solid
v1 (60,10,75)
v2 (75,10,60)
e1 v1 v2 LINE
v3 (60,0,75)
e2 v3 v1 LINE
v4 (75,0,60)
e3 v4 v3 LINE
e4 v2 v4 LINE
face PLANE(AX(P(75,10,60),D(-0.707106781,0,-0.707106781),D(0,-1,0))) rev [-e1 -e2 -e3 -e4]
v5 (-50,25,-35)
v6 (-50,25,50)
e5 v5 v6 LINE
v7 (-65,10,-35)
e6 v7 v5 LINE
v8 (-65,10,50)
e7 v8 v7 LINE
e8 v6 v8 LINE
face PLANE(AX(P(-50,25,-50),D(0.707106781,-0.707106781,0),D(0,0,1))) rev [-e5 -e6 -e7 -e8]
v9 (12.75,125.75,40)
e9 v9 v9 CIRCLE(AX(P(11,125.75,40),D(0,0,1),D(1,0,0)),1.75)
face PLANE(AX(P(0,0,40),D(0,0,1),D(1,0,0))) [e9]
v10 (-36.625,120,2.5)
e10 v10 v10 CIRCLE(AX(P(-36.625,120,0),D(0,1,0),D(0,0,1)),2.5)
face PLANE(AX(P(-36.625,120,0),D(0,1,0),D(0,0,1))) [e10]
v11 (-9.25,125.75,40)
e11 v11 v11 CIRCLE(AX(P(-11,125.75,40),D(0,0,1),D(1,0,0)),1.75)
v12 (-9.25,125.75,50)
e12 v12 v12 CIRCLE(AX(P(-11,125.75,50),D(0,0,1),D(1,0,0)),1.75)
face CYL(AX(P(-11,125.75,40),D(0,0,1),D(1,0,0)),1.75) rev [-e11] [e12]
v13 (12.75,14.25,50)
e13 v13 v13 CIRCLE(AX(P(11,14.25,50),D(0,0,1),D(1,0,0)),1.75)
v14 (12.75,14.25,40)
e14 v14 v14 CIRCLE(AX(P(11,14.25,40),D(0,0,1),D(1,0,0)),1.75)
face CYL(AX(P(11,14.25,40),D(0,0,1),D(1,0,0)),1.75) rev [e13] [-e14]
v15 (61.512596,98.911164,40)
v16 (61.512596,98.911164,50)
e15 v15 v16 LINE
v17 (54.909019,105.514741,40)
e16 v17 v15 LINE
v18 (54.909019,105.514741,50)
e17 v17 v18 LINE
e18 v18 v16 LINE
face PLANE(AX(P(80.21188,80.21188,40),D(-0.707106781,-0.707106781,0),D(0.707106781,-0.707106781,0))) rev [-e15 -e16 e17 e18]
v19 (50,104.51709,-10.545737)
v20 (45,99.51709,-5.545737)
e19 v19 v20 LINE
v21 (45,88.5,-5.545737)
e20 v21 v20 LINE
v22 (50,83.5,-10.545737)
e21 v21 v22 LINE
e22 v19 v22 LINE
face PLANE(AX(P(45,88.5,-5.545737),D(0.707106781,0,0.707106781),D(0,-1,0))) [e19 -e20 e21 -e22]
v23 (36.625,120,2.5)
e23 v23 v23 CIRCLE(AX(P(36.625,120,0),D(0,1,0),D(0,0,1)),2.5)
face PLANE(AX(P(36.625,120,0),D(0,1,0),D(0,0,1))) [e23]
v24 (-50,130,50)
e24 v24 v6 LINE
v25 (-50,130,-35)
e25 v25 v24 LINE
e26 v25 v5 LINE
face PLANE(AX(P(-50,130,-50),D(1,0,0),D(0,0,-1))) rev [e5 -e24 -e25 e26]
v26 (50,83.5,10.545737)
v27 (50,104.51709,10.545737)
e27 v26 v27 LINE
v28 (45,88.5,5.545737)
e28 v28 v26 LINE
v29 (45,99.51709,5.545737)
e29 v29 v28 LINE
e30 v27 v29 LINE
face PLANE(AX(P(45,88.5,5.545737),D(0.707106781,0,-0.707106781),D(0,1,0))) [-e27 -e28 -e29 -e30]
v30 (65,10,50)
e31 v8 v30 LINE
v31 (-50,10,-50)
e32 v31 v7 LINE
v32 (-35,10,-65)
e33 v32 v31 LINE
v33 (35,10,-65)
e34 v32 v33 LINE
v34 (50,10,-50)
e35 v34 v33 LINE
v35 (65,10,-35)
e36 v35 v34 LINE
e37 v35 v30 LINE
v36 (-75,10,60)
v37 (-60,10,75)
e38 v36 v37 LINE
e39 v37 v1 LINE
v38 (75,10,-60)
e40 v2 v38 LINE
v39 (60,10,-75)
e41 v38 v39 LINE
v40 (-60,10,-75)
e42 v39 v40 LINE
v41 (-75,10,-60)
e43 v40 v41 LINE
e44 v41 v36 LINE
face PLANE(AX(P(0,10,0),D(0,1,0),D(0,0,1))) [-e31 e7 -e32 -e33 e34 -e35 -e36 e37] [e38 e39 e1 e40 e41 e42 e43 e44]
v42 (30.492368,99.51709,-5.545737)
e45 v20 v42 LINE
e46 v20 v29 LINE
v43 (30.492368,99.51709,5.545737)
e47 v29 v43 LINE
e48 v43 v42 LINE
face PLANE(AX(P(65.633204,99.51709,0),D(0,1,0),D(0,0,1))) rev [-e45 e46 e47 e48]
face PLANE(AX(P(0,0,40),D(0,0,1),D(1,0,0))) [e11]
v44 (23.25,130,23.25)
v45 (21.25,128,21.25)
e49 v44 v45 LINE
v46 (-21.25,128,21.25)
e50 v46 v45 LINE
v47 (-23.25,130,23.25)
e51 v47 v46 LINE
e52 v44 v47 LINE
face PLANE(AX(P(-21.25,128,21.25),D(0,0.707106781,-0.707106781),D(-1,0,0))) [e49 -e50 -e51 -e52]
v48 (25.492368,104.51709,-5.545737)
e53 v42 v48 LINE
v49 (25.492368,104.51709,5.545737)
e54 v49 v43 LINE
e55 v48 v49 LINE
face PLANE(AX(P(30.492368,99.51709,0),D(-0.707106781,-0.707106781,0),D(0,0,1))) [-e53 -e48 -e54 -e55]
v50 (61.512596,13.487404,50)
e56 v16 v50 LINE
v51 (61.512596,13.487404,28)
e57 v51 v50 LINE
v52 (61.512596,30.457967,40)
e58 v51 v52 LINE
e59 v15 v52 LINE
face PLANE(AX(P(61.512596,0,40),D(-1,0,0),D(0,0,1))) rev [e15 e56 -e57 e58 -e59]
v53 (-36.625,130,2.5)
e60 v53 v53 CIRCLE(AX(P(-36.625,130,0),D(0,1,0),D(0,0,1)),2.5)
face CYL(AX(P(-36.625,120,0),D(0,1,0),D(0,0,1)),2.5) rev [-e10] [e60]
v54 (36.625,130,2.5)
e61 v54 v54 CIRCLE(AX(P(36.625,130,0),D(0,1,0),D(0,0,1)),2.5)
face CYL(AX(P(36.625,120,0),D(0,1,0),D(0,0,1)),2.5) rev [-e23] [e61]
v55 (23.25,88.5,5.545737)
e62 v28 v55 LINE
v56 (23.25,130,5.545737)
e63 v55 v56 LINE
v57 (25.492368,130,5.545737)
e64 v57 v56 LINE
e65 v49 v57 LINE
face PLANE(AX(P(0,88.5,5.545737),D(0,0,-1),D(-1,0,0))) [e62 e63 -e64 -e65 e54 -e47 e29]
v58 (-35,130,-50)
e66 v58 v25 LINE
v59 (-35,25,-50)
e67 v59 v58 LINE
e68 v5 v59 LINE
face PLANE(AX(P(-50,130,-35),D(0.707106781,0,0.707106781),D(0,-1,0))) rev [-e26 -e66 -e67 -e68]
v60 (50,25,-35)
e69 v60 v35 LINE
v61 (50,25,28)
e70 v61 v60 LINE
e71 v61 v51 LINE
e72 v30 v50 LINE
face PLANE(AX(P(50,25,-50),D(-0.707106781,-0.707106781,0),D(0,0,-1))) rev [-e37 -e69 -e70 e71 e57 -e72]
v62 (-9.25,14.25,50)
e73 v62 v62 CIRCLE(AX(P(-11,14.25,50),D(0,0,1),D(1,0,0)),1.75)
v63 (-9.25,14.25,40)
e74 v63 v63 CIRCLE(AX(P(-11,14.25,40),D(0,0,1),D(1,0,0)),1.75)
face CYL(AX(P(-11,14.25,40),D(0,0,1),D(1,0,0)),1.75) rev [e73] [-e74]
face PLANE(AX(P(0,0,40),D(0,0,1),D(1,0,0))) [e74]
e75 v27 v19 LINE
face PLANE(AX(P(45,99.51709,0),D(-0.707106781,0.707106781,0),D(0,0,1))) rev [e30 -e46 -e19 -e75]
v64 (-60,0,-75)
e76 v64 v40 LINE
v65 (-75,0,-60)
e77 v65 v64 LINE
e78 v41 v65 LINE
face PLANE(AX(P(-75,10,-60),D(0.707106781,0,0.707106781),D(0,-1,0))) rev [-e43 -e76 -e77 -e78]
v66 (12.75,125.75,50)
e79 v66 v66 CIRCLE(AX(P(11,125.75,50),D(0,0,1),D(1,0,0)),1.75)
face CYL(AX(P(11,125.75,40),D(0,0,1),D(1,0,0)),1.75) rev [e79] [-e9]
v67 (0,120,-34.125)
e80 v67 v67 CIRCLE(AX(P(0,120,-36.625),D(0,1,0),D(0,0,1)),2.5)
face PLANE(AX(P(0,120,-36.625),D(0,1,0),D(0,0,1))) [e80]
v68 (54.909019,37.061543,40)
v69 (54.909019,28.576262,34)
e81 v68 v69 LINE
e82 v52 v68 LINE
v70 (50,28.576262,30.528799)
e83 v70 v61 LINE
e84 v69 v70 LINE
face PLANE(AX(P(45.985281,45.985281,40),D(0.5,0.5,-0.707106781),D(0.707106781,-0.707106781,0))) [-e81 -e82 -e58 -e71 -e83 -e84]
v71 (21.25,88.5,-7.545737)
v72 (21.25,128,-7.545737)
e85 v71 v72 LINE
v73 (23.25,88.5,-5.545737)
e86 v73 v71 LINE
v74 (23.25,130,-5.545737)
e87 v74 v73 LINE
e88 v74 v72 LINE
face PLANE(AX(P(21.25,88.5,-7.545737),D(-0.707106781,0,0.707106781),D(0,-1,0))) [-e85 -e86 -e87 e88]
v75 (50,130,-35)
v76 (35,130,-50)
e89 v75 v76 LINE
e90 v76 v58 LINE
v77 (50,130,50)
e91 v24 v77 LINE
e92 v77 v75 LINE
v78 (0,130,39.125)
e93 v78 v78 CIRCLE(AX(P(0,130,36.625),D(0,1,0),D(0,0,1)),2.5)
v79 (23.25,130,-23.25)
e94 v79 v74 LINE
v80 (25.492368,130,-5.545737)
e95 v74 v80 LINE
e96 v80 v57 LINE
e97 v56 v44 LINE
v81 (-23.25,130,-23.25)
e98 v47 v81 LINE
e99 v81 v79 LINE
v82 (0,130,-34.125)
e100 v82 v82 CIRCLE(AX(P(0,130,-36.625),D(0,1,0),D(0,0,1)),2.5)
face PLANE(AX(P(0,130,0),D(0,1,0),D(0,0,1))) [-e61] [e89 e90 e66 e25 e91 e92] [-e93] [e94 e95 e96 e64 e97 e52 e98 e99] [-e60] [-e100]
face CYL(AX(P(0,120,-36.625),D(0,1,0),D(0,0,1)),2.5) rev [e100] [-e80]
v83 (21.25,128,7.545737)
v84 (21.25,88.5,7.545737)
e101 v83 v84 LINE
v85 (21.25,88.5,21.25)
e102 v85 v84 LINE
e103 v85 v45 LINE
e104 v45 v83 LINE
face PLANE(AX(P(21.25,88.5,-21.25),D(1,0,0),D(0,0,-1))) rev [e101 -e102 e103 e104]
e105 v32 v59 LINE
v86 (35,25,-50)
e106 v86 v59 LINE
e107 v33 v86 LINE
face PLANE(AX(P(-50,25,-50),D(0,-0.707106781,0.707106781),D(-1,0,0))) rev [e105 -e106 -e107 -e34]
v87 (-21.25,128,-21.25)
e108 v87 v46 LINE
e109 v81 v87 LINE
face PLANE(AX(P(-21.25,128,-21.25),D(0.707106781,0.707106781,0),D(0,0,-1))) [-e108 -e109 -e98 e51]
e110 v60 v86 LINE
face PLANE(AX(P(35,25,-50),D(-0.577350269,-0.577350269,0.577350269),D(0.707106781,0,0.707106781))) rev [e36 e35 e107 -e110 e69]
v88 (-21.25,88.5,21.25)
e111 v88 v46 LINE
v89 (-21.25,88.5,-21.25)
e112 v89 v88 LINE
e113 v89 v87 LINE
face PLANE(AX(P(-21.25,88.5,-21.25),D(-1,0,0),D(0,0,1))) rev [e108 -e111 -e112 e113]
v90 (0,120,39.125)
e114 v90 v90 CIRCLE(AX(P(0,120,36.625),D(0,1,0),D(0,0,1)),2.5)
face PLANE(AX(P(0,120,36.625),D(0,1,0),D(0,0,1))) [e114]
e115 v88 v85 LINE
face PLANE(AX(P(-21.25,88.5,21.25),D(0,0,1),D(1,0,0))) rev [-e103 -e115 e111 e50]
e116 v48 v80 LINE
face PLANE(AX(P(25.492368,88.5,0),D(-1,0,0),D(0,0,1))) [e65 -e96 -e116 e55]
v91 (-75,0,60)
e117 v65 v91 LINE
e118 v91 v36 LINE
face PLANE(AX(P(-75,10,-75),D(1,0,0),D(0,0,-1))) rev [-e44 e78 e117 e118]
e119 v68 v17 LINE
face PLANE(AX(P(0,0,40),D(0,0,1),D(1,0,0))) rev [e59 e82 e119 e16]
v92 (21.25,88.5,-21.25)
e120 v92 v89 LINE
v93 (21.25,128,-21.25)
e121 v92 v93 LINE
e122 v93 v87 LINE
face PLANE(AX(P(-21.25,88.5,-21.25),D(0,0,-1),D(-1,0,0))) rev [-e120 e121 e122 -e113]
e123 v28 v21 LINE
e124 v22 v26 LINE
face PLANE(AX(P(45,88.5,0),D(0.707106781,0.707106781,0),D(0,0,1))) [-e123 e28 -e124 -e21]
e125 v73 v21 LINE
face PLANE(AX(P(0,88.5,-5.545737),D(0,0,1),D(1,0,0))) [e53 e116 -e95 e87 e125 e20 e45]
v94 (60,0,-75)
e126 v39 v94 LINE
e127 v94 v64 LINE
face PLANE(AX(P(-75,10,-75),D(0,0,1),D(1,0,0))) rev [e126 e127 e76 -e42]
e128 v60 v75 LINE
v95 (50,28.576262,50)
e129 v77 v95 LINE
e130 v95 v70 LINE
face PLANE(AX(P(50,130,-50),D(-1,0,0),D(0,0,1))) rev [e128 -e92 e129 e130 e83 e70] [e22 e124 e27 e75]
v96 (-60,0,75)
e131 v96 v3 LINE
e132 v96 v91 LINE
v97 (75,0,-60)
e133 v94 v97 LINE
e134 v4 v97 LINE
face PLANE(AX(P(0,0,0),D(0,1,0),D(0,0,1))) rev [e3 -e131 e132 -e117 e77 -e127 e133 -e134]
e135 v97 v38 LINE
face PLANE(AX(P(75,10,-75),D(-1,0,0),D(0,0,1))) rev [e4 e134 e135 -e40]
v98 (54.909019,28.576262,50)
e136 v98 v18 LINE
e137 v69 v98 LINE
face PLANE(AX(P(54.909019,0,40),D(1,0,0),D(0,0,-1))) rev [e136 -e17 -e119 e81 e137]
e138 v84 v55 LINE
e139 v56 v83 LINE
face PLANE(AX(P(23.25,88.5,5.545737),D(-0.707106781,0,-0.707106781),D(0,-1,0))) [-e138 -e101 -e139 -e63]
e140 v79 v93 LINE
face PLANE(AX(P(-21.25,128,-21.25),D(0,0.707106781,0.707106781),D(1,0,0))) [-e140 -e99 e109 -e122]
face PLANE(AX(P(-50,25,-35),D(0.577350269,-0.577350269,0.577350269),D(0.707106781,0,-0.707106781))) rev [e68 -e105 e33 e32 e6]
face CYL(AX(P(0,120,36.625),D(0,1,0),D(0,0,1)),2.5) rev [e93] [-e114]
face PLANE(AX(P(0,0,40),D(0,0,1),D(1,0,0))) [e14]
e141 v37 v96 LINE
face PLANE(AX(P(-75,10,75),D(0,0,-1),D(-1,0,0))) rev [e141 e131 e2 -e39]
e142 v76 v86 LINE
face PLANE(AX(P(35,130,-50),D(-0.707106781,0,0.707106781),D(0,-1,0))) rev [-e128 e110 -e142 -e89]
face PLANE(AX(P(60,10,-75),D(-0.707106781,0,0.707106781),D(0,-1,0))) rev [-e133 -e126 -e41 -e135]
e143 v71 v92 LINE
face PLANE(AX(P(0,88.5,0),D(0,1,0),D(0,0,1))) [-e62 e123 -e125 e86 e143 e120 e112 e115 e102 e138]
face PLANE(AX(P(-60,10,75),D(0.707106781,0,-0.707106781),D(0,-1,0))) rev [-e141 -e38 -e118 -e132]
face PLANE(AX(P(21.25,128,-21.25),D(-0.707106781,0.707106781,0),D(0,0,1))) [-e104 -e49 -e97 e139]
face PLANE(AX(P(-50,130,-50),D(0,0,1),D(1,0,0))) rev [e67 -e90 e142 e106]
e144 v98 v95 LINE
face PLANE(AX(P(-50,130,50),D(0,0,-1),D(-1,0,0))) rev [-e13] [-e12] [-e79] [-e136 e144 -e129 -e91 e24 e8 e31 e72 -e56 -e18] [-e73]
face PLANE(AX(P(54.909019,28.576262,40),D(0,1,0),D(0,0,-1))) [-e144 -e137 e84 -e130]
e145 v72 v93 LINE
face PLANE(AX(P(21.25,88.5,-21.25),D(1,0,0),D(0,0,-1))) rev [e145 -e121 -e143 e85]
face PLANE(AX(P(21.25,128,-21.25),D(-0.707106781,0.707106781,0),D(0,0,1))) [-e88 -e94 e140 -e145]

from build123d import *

# Parameters (mm, degrees)
SKETCH1_W           = 150
SKETCH1_H           = 150
BOSS_EXTRUDE1_DEPTH = 10
SKETCH2_W           = 100
SKETCH2_H           = 100
BOSS_EXTRUDE2_DEPTH = 120
SKETCH3_W           = 42.5
SKETCH3_H           = 42.5
CUT_EXTRUDE1_DEPTH  = 41.5
CHAMFER1_SIZE       = 15
CHAMFER2_SIZE       = 15
SKETCH4_W           = 4.242368117
SKETCH4_H           = 5.545736957
CUT_EXTRUDE2_DEPTH  = 41.5
SKETCH5_W           = 11.091473914
SKETCH5_H           = 11.017090126
CUT_EXTRUDE5_DEPTH  = 24.507631883
CHAMFER3_SIZE       = 5
CHAMFER4_SIZE       = 5
CHAMFER5_SIZE       = 2
SKETCH6_R           = 1.75
CUT_EXTRUDE6_DEPTH  = 10
BOSS_EXTRUDE3_DEPTH = 10
CHAMFER6_SIZE       = 12
SKETCH8_R           = 2.5
CUT_EXTRUDE7_DEPTH  = 10


with BuildPart() as part:
    # Sketch1 → Boss-Extrude1 (new body)
    with BuildSketch(Plane(origin=(0, 0, 0), x_dir=(1, 0, 0), z_dir=(0, 1, 0))):
        Rectangle(SKETCH1_W, SKETCH1_H)
    extrude(amount=BOSS_EXTRUDE1_DEPTH)

    # Sketch2 → Boss-Extrude2 (add)
    with BuildSketch(Plane(origin=(0, 10, 0), x_dir=(1, 0, 0), z_dir=(0, 1, 0))):
        Rectangle(SKETCH2_W, SKETCH2_H)
    extrude(amount=BOSS_EXTRUDE2_DEPTH)

    # Sketch3 → Cut-Extrude1 (cut)
    with BuildSketch(Plane(origin=(0, 130, 0), x_dir=(1, 0, 0), z_dir=(0, 1, 0))):
        Rectangle(SKETCH3_W, SKETCH3_H)
    extrude(amount=-CUT_EXTRUDE1_DEPTH, mode=Mode.SUBTRACT)

    # Chamfer1
    chamfer1_edges = [part.edges().sort_by_distance(p)[0] for p in [
        (75, 5, 75),
        (-75, 5, 75),
        (-75, 5, -75),
        (75, 5, -75),
    ]]
    chamfer(chamfer1_edges, length=CHAMFER1_SIZE)

    # Chamfer2
    chamfer2_edges = [part.edges().sort_by_distance(p)[0] for p in [
        (50, 10, 0),
        (0, 10, -50),
        (50, 70, -50),
        (-50, 10, 0),
        (-50, 70, -50),
    ]]
    chamfer(chamfer2_edges, length=CHAMFER2_SIZE)

    # Sketch4 → Cut-Extrude2 (cut)
    with BuildSketch(Plane(origin=(0, 130, 0), x_dir=(1, 0, 0), z_dir=(0, 1, 0))):
        with Locations((23.371184058, -2.772868478)):
            Rectangle(SKETCH4_W, SKETCH4_H)
        with Locations((23.371184058, 2.772868478)):
            Rectangle(SKETCH4_W, SKETCH4_H)
    extrude(amount=-CUT_EXTRUDE2_DEPTH, mode=Mode.SUBTRACT)

    # Sketch5 → Cut-Extrude5 (cut)
    with BuildSketch(Plane.ZY.offset(-25.492368117)):
        with Locations((0, 94.008545063)):
            Rectangle(SKETCH5_W, SKETCH5_H)
    extrude(amount=-CUT_EXTRUDE5_DEPTH, mode=Mode.SUBTRACT)

    # Chamfer3
    chamfer3_edges = [part.edges().sort_by_distance(p)[0] for p in [
        (50, 94.008545063, 5.545736957),
        (50, 88.5, 0),
        (50, 94.008545063, -5.545736957),
        (50, 99.517090126, 0),
    ]]
    chamfer(chamfer3_edges, length=CHAMFER3_SIZE)

    # Chamfer4
    chamfer4_edges = [part.edges().sort_by_distance(p)[0] for p in [
        (25.492368117, 99.517090126, 0),
    ]]
    chamfer(chamfer4_edges, length=CHAMFER4_SIZE)

    # Chamfer5
    chamfer5_edges = [part.edges().sort_by_distance(p)[0] for p in [
        (21.25, 130, -13.397868478),
        (21.25, 109.25, 5.545736957),
        (21.25, 109.25, -5.545736957),
        (21.25, 130, 13.397868478),
        (0, 130, -21.25),
        (-21.25, 130, 0),
        (0, 130, 21.25),
    ]]
    chamfer(chamfer5_edges, length=CHAMFER5_SIZE)

    # Sketch6 → Cut-Extrude6 (cut)
    with BuildSketch(Plane.XY.offset(50)):
        with Locations((-11, 125.75)):
            Circle(SKETCH6_R)
        with Locations((11, 125.75)):
            Circle(SKETCH6_R)
        with Locations((-11, 14.25)):
            Circle(SKETCH6_R)
        with Locations((11, 14.25)):
            Circle(SKETCH6_R)
    extrude(amount=-CUT_EXTRUDE6_DEPTH, mode=Mode.SUBTRACT)

    # Sketch7 → Boss-Extrude3 (add)
    with BuildSketch(Plane.XY.offset(50)):
        Polygon((54.909019499, 105.514740538), (54.909019499, 20.090980501), (61.512596017, 13.487403983), (61.512596017, 98.91116402), align=None)
    extrude(amount=-BOSS_EXTRUDE3_DEPTH)

    # Chamfer6
    chamfer6_edges = [part.edges().sort_by_distance(p)[0] for p in [
        (58.210807758, 16.789192242, 40),
    ]]
    chamfer(chamfer6_edges, length=CHAMFER6_SIZE)
    # the kernel refuses this chamfer: 12, 8.485281374 mm, written as the material it adds along each edge
    with BuildSketch(Plane(origin=(54.909019499, 20.090980501, 50), x_dir=(-0.7262819568766928, 0.687396915264654, 0), z_dir=(0, 0, -1))) as chamfer6_2_piece_1:
        with BuildLine():
            Line((12.344078342, 0), (5.484140903, 6.49265728))
            Line((5.484140903, 6.49265728), (5.309833233, 6.65763254))
            ThreePointArc((5.309833233, 6.65763254), (2.742070451, 3.24632864), (-0.17430767, 0.16497526))
            Line((-0.17430767, 0.16497526), (0.00659901, -0.23990926))
            ThreePointArc((0.00659901, -0.23990926), (6.173971977, -0.070267795), (12.350677353, -0.23990926))
            Line((12.350677353, -0.23990926), (12.344078342, 0))
        make_face()
    extrude(amount=10)
    with BuildSketch(Plane(origin=(54.909019499, 20.090980501, 40), x_dir=(-0.7262819568766887, 0.6873969152646581, 0), z_dir=(0, 0, -1))) as chamfer6_2_piece_2_section:
        with BuildLine():
            Line((12.344078342, 0), (5.484140903, 6.49265728))
            Line((5.484140903, 6.49265728), (5.309833233, 6.65763254))
            ThreePointArc((5.309833233, 6.65763254), (2.742070451, 3.24632864), (-0.17430767, 0.16497526))
            Line((-0.17430767, 0.16497526), (0.00659901, -0.23990926))
            ThreePointArc((0.00659901, -0.23990926), (6.173971977, -0.070267795), (12.350677353, -0.23990926))
            Line((12.350677353, -0.23990926), (12.344078342, 0))
        make_face()
    chamfer6_2_piece_2 = extrude(amount=42.860195856, mode=Mode.PRIVATE)
    chamfer6_2_piece_2 = split(chamfer6_2_piece_2, bisect_by=Plane(origin=(53.690480503, 27.337708231, 32.262573132), z_dir=(-0.5000000000000001, -0.5000000000000001, 0.7071067811865475)), keep=Keep.TOP, mode=Mode.PRIVATE)
    add(chamfer6_2_piece_2)

    # Sketch8 → Cut-Extrude7 (cut)
    with BuildSketch(Plane(origin=(0, 130, 0), x_dir=(1, 0, 0), z_dir=(0, 1, 0))):
        with Locations(Location((0, 36.625, 0), (0, 0, 270))):
            Circle(SKETCH8_R)
        with Locations(Location((36.625, 0, 0), (0, 0, 270))):
            Circle(SKETCH8_R)
        with Locations(Location((0, -36.625, 0), (0, 0, 270))):
            Circle(SKETCH8_R)
        with Locations(Location((-36.625, 0, 0), (0, 0, 270))):
            Circle(SKETCH8_R)
    extrude(amount=-CUT_EXTRUDE7_DEPTH, mode=Mode.SUBTRACT)


solid = part.part
